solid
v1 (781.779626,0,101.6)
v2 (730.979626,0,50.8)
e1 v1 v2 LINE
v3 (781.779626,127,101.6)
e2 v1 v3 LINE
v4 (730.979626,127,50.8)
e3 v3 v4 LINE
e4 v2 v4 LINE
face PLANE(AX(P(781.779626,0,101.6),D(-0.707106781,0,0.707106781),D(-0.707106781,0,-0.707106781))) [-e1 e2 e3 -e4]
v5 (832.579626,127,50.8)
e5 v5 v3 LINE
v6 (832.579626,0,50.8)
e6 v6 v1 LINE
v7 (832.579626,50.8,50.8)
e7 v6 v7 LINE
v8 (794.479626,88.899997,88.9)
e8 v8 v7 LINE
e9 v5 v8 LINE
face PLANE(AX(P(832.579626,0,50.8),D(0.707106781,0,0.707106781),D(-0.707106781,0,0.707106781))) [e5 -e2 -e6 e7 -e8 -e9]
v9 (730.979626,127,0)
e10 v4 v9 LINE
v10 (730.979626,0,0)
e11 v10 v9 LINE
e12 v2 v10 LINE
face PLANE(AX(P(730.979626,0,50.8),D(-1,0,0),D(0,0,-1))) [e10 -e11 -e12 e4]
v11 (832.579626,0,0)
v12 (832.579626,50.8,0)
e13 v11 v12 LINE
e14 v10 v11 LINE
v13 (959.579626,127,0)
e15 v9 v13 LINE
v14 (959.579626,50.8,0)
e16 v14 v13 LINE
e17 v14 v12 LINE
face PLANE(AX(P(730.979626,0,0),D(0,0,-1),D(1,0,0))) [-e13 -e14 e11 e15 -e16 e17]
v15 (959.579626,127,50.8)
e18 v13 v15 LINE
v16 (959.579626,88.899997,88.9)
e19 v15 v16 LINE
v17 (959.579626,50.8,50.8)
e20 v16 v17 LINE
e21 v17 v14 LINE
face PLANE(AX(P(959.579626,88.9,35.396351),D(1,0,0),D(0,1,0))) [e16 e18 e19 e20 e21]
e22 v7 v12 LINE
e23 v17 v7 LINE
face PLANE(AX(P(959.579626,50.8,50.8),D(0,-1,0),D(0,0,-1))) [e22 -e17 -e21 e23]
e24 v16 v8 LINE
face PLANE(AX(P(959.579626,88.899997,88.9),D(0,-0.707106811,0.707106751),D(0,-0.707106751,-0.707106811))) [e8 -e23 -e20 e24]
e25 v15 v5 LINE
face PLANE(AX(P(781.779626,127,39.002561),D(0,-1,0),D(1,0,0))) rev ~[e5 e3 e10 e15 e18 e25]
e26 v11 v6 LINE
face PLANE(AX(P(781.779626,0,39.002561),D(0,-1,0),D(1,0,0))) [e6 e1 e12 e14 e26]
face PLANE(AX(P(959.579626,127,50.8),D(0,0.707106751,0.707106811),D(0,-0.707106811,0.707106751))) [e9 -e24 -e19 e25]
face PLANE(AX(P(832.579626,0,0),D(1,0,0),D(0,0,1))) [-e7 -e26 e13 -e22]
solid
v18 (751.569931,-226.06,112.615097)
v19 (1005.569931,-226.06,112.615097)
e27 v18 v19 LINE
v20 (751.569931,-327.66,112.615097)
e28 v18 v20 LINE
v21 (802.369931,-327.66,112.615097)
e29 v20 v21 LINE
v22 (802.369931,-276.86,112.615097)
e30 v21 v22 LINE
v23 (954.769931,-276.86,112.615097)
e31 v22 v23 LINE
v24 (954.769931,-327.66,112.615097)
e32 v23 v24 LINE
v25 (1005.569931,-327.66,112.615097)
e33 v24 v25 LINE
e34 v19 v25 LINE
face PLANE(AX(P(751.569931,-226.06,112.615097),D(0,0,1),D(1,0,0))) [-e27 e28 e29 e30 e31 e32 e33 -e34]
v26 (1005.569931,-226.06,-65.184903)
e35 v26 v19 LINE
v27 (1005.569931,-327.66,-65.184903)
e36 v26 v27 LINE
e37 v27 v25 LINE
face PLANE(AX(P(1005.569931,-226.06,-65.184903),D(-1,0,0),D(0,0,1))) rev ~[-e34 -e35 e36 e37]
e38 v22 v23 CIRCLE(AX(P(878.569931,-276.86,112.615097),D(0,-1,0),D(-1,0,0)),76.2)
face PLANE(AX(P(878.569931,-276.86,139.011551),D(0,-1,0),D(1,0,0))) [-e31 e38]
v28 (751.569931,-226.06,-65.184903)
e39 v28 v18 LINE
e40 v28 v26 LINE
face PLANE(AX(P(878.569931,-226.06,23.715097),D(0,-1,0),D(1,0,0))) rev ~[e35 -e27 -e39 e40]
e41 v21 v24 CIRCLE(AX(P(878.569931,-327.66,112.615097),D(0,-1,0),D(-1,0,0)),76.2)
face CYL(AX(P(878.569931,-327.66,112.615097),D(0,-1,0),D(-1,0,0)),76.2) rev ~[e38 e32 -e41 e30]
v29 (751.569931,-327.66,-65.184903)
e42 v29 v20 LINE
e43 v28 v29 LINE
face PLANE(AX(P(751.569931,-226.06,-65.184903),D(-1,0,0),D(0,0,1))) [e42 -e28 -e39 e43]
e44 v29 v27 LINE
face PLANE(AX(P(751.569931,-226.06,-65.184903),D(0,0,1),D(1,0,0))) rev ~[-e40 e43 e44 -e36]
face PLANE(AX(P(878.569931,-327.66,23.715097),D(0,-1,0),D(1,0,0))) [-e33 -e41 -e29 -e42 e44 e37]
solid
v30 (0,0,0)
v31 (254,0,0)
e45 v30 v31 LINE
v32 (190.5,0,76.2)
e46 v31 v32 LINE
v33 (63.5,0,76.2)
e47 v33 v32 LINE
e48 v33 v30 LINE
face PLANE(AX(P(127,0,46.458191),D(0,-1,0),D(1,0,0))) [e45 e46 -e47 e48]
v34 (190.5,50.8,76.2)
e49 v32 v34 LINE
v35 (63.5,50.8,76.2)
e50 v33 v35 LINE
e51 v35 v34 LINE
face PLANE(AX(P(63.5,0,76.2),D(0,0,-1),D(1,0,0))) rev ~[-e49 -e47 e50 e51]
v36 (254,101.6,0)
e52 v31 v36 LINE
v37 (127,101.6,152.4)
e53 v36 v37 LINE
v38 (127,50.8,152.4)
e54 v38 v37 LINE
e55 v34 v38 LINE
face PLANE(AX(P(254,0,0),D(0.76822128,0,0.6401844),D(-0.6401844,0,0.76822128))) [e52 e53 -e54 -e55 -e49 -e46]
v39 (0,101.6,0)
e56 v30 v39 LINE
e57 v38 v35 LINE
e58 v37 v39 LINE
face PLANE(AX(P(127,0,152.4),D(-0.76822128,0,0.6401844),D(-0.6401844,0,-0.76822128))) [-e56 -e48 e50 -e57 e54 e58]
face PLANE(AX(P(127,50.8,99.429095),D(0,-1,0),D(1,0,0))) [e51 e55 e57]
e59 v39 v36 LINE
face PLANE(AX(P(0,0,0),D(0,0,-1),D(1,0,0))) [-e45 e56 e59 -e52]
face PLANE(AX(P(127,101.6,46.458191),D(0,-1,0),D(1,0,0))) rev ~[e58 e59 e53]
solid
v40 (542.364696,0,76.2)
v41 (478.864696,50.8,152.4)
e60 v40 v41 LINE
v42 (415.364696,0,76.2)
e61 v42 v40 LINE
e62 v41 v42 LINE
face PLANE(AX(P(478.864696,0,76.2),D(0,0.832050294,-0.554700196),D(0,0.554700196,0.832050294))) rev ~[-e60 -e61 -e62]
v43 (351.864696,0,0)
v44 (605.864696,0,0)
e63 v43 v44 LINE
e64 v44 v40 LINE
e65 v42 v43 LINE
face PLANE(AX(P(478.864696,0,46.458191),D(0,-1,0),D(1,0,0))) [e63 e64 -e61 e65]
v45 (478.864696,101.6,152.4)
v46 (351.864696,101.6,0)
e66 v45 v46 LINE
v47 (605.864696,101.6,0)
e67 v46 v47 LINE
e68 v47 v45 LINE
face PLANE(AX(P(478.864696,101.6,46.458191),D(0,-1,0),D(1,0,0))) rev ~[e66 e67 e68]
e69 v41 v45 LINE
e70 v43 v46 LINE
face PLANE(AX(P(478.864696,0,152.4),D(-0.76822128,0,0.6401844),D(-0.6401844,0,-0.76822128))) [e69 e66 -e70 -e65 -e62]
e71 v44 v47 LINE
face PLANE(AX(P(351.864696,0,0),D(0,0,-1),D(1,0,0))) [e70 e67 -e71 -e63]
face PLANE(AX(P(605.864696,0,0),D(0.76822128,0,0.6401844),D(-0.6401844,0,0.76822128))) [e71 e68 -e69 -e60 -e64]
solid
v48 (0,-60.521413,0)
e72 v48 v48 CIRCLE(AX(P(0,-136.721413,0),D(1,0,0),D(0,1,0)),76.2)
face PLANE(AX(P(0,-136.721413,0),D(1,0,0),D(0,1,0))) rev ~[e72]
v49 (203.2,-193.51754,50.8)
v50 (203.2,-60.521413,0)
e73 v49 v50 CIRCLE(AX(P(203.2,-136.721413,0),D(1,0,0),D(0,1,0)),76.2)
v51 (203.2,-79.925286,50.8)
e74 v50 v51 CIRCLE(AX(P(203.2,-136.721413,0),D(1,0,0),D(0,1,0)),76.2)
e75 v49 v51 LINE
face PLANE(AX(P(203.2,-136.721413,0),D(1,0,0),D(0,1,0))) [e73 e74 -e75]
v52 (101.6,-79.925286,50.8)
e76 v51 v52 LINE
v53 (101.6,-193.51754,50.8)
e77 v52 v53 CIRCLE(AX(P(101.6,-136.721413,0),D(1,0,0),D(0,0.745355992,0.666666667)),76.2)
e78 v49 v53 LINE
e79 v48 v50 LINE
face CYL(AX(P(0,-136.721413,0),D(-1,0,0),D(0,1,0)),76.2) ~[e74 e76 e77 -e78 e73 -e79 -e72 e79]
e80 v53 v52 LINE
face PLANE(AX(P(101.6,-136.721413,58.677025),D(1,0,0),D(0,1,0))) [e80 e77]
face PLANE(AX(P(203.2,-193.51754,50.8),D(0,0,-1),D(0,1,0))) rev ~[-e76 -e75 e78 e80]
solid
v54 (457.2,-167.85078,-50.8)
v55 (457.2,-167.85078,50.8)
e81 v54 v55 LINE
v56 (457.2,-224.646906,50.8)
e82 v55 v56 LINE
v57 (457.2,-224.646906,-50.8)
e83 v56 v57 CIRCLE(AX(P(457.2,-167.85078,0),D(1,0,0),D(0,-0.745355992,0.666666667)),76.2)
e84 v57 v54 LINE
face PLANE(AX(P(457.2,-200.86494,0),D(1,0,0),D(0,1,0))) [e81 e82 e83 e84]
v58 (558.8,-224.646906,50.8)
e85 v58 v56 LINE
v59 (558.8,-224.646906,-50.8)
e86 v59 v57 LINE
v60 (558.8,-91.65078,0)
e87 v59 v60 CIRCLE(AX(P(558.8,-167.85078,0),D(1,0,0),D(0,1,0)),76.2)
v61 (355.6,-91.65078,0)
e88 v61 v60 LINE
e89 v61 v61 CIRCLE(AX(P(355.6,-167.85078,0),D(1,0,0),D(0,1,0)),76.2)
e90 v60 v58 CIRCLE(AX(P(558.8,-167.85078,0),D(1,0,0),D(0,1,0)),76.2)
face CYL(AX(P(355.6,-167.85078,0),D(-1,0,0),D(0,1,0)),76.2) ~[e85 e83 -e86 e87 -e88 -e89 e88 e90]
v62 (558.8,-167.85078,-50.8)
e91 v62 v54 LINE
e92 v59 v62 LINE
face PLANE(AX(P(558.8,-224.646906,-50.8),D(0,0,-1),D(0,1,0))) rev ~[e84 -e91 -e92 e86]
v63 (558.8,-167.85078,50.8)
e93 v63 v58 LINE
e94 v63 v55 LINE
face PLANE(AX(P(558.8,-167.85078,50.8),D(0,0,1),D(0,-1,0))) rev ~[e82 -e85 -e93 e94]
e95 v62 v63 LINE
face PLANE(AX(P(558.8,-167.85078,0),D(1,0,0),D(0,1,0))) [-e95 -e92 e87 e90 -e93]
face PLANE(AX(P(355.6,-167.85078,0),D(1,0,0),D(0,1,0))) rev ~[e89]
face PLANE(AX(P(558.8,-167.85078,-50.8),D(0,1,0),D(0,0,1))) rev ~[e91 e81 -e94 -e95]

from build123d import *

# Parameters (mm, degrees)
F1_DEPTH  = 101.6
F3_DEPTH  = 50.8
F5_DEPTH  = 101.6
F9_DEPTH  = 76.2
F11_DEPTH = 127
F15_R     = 76.2
F16_DEPTH = 203.2
F18_DEPTH = 101.6
F20_R     = 76.2
F21_DEPTH = 203.2
F24_DEPTH = 101.6
F25_W     = 254
F25_H     = 177.8
F26_DEPTH = 101.6
F28_DEPTH = 50.8


with BuildPart() as f1:
    # F0 (on Front) → F1 (new body)
    with BuildSketch(Plane.XZ):
        Polygon((127, 152.4), (0, 0), (254, 0), align=None)
    extrude(amount=-F1_DEPTH)

    # F2 (on face) → F3 (cut)
    with BuildSketch(Plane.XZ):
        Polygon((127, 152.4), (63.5, 76.2), (190.5, 76.2), align=None)
    extrude(amount=-F3_DEPTH, mode=Mode.SUBTRACT)


with BuildPart() as f5:
    # F4 (on Front) → F5 (new body)
    with BuildSketch(Plane.XZ):
        Polygon((478.864695549, 152.4), (351.864695549, 0), (605.864695549, 0), align=None)
    extrude(amount=-F5_DEPTH)

    # F8 (on 3pt) → F9 (cut, symmetric)
    with BuildSketch(Plane.YZ.offset(478.864695549)):
        Polygon((0, 152.4), (0, 76.2), (50.8, 152.4), align=None)
    extrude(amount=F9_DEPTH, both=True, mode=Mode.SUBTRACT)


with BuildPart() as f11:
    # F10 (on Front) → F11 (new body)
    with BuildSketch(Plane.XZ):
        Polygon((730.9796256996, 50.8), (730.9796256996, 0), (832.5796256996, 0), (832.5796256996, 50.8), (781.7796256996, 101.6), align=None)
    extrude(amount=-F11_DEPTH)

    # F13 (on offset) → F14 (join, up to the next surface of F11)
    with BuildSketch(Plane.YZ.offset(959.5796256996)):
        Polygon((50.8, 50.8), (50.8, 0), (127, 0), (127, 50.8), (88.8999967435, 88.9), align=None)
    extrude(until=Until.NEXT, dir=(-1, 0, 0))


with BuildPart() as f16:
    # F15 (on Right) → F16 (new body)
    with BuildSketch(Plane.YZ):
        with Locations((-136.7214130477, 0)):
            Circle(F15_R)
    extrude(amount=F16_DEPTH)

    # F17 (on face) → F18 (cut)
    with BuildSketch(Plane.YZ.offset(203.2)):
        with BuildLine():
            ThreePointArc((-79.9252864192, 50.8), (-136.7214130477, 76.2), (-193.5175396762, 50.8))
            Line((-193.5175396762, 50.8), (-79.9252864192, 50.8))
        make_face()
    extrude(amount=-F18_DEPTH, mode=Mode.SUBTRACT)


with BuildPart() as f21:
    # F20 (on offset) → F21 (new body)
    with BuildSketch(Plane.YZ.offset(355.6)):
        with Locations((-167.850779579, 0)):
            Circle(F20_R)
    extrude(amount=F21_DEPTH)

    # F23 (on face) → F24 (cut)
    with BuildSketch(Plane.YZ.offset(558.8)):
        with BuildLine():
            Line((-167.850779579, 50.8), (-224.6469062075, 50.8))
            ThreePointArc((-224.6469062075, 50.8), (-244.050779579, 0), (-224.6469062075, -50.8))
            Line((-224.6469062075, -50.8), (-167.850779579, -50.8))
            Line((-167.850779579, -50.8), (-167.850779579, 50.8))
        make_face()
    extrude(amount=-F24_DEPTH, mode=Mode.SUBTRACT)


with BuildPart() as f26:
    # F25 (on offset) → F26 (new body)
    with BuildSketch(Plane.XZ.offset(226.06)):
        with Locations((878.5699307919, 23.7150967563)):
            Rectangle(F25_W, F25_H)
    extrude(amount=F26_DEPTH)

    # F27 (on face) → F28 (cut)
    with BuildSketch(Plane.XZ.offset(327.66)):
        with BuildLine():
            Line((802.3699307919, 112.6150967563), (954.7699307919, 112.6150967563))
            ThreePointArc((954.7699307919, 112.6150967563), (878.5699307919, 188.8150967563), (802.3699307919, 112.6150967563))
        make_face()
        with BuildLine():
            ThreePointArc((802.3699307919, 112.6150967563), (878.5699307919, 36.4150967563), (954.7699307919, 112.6150967563))
            Line((954.7699307919, 112.6150967563), (802.3699307919, 112.6150967563))
        make_face()
    extrude(amount=-F28_DEPTH, mode=Mode.SUBTRACT)


solid = Compound([f1.part, f5.part, f11.part, f16.part, f21.part, f26.part])
